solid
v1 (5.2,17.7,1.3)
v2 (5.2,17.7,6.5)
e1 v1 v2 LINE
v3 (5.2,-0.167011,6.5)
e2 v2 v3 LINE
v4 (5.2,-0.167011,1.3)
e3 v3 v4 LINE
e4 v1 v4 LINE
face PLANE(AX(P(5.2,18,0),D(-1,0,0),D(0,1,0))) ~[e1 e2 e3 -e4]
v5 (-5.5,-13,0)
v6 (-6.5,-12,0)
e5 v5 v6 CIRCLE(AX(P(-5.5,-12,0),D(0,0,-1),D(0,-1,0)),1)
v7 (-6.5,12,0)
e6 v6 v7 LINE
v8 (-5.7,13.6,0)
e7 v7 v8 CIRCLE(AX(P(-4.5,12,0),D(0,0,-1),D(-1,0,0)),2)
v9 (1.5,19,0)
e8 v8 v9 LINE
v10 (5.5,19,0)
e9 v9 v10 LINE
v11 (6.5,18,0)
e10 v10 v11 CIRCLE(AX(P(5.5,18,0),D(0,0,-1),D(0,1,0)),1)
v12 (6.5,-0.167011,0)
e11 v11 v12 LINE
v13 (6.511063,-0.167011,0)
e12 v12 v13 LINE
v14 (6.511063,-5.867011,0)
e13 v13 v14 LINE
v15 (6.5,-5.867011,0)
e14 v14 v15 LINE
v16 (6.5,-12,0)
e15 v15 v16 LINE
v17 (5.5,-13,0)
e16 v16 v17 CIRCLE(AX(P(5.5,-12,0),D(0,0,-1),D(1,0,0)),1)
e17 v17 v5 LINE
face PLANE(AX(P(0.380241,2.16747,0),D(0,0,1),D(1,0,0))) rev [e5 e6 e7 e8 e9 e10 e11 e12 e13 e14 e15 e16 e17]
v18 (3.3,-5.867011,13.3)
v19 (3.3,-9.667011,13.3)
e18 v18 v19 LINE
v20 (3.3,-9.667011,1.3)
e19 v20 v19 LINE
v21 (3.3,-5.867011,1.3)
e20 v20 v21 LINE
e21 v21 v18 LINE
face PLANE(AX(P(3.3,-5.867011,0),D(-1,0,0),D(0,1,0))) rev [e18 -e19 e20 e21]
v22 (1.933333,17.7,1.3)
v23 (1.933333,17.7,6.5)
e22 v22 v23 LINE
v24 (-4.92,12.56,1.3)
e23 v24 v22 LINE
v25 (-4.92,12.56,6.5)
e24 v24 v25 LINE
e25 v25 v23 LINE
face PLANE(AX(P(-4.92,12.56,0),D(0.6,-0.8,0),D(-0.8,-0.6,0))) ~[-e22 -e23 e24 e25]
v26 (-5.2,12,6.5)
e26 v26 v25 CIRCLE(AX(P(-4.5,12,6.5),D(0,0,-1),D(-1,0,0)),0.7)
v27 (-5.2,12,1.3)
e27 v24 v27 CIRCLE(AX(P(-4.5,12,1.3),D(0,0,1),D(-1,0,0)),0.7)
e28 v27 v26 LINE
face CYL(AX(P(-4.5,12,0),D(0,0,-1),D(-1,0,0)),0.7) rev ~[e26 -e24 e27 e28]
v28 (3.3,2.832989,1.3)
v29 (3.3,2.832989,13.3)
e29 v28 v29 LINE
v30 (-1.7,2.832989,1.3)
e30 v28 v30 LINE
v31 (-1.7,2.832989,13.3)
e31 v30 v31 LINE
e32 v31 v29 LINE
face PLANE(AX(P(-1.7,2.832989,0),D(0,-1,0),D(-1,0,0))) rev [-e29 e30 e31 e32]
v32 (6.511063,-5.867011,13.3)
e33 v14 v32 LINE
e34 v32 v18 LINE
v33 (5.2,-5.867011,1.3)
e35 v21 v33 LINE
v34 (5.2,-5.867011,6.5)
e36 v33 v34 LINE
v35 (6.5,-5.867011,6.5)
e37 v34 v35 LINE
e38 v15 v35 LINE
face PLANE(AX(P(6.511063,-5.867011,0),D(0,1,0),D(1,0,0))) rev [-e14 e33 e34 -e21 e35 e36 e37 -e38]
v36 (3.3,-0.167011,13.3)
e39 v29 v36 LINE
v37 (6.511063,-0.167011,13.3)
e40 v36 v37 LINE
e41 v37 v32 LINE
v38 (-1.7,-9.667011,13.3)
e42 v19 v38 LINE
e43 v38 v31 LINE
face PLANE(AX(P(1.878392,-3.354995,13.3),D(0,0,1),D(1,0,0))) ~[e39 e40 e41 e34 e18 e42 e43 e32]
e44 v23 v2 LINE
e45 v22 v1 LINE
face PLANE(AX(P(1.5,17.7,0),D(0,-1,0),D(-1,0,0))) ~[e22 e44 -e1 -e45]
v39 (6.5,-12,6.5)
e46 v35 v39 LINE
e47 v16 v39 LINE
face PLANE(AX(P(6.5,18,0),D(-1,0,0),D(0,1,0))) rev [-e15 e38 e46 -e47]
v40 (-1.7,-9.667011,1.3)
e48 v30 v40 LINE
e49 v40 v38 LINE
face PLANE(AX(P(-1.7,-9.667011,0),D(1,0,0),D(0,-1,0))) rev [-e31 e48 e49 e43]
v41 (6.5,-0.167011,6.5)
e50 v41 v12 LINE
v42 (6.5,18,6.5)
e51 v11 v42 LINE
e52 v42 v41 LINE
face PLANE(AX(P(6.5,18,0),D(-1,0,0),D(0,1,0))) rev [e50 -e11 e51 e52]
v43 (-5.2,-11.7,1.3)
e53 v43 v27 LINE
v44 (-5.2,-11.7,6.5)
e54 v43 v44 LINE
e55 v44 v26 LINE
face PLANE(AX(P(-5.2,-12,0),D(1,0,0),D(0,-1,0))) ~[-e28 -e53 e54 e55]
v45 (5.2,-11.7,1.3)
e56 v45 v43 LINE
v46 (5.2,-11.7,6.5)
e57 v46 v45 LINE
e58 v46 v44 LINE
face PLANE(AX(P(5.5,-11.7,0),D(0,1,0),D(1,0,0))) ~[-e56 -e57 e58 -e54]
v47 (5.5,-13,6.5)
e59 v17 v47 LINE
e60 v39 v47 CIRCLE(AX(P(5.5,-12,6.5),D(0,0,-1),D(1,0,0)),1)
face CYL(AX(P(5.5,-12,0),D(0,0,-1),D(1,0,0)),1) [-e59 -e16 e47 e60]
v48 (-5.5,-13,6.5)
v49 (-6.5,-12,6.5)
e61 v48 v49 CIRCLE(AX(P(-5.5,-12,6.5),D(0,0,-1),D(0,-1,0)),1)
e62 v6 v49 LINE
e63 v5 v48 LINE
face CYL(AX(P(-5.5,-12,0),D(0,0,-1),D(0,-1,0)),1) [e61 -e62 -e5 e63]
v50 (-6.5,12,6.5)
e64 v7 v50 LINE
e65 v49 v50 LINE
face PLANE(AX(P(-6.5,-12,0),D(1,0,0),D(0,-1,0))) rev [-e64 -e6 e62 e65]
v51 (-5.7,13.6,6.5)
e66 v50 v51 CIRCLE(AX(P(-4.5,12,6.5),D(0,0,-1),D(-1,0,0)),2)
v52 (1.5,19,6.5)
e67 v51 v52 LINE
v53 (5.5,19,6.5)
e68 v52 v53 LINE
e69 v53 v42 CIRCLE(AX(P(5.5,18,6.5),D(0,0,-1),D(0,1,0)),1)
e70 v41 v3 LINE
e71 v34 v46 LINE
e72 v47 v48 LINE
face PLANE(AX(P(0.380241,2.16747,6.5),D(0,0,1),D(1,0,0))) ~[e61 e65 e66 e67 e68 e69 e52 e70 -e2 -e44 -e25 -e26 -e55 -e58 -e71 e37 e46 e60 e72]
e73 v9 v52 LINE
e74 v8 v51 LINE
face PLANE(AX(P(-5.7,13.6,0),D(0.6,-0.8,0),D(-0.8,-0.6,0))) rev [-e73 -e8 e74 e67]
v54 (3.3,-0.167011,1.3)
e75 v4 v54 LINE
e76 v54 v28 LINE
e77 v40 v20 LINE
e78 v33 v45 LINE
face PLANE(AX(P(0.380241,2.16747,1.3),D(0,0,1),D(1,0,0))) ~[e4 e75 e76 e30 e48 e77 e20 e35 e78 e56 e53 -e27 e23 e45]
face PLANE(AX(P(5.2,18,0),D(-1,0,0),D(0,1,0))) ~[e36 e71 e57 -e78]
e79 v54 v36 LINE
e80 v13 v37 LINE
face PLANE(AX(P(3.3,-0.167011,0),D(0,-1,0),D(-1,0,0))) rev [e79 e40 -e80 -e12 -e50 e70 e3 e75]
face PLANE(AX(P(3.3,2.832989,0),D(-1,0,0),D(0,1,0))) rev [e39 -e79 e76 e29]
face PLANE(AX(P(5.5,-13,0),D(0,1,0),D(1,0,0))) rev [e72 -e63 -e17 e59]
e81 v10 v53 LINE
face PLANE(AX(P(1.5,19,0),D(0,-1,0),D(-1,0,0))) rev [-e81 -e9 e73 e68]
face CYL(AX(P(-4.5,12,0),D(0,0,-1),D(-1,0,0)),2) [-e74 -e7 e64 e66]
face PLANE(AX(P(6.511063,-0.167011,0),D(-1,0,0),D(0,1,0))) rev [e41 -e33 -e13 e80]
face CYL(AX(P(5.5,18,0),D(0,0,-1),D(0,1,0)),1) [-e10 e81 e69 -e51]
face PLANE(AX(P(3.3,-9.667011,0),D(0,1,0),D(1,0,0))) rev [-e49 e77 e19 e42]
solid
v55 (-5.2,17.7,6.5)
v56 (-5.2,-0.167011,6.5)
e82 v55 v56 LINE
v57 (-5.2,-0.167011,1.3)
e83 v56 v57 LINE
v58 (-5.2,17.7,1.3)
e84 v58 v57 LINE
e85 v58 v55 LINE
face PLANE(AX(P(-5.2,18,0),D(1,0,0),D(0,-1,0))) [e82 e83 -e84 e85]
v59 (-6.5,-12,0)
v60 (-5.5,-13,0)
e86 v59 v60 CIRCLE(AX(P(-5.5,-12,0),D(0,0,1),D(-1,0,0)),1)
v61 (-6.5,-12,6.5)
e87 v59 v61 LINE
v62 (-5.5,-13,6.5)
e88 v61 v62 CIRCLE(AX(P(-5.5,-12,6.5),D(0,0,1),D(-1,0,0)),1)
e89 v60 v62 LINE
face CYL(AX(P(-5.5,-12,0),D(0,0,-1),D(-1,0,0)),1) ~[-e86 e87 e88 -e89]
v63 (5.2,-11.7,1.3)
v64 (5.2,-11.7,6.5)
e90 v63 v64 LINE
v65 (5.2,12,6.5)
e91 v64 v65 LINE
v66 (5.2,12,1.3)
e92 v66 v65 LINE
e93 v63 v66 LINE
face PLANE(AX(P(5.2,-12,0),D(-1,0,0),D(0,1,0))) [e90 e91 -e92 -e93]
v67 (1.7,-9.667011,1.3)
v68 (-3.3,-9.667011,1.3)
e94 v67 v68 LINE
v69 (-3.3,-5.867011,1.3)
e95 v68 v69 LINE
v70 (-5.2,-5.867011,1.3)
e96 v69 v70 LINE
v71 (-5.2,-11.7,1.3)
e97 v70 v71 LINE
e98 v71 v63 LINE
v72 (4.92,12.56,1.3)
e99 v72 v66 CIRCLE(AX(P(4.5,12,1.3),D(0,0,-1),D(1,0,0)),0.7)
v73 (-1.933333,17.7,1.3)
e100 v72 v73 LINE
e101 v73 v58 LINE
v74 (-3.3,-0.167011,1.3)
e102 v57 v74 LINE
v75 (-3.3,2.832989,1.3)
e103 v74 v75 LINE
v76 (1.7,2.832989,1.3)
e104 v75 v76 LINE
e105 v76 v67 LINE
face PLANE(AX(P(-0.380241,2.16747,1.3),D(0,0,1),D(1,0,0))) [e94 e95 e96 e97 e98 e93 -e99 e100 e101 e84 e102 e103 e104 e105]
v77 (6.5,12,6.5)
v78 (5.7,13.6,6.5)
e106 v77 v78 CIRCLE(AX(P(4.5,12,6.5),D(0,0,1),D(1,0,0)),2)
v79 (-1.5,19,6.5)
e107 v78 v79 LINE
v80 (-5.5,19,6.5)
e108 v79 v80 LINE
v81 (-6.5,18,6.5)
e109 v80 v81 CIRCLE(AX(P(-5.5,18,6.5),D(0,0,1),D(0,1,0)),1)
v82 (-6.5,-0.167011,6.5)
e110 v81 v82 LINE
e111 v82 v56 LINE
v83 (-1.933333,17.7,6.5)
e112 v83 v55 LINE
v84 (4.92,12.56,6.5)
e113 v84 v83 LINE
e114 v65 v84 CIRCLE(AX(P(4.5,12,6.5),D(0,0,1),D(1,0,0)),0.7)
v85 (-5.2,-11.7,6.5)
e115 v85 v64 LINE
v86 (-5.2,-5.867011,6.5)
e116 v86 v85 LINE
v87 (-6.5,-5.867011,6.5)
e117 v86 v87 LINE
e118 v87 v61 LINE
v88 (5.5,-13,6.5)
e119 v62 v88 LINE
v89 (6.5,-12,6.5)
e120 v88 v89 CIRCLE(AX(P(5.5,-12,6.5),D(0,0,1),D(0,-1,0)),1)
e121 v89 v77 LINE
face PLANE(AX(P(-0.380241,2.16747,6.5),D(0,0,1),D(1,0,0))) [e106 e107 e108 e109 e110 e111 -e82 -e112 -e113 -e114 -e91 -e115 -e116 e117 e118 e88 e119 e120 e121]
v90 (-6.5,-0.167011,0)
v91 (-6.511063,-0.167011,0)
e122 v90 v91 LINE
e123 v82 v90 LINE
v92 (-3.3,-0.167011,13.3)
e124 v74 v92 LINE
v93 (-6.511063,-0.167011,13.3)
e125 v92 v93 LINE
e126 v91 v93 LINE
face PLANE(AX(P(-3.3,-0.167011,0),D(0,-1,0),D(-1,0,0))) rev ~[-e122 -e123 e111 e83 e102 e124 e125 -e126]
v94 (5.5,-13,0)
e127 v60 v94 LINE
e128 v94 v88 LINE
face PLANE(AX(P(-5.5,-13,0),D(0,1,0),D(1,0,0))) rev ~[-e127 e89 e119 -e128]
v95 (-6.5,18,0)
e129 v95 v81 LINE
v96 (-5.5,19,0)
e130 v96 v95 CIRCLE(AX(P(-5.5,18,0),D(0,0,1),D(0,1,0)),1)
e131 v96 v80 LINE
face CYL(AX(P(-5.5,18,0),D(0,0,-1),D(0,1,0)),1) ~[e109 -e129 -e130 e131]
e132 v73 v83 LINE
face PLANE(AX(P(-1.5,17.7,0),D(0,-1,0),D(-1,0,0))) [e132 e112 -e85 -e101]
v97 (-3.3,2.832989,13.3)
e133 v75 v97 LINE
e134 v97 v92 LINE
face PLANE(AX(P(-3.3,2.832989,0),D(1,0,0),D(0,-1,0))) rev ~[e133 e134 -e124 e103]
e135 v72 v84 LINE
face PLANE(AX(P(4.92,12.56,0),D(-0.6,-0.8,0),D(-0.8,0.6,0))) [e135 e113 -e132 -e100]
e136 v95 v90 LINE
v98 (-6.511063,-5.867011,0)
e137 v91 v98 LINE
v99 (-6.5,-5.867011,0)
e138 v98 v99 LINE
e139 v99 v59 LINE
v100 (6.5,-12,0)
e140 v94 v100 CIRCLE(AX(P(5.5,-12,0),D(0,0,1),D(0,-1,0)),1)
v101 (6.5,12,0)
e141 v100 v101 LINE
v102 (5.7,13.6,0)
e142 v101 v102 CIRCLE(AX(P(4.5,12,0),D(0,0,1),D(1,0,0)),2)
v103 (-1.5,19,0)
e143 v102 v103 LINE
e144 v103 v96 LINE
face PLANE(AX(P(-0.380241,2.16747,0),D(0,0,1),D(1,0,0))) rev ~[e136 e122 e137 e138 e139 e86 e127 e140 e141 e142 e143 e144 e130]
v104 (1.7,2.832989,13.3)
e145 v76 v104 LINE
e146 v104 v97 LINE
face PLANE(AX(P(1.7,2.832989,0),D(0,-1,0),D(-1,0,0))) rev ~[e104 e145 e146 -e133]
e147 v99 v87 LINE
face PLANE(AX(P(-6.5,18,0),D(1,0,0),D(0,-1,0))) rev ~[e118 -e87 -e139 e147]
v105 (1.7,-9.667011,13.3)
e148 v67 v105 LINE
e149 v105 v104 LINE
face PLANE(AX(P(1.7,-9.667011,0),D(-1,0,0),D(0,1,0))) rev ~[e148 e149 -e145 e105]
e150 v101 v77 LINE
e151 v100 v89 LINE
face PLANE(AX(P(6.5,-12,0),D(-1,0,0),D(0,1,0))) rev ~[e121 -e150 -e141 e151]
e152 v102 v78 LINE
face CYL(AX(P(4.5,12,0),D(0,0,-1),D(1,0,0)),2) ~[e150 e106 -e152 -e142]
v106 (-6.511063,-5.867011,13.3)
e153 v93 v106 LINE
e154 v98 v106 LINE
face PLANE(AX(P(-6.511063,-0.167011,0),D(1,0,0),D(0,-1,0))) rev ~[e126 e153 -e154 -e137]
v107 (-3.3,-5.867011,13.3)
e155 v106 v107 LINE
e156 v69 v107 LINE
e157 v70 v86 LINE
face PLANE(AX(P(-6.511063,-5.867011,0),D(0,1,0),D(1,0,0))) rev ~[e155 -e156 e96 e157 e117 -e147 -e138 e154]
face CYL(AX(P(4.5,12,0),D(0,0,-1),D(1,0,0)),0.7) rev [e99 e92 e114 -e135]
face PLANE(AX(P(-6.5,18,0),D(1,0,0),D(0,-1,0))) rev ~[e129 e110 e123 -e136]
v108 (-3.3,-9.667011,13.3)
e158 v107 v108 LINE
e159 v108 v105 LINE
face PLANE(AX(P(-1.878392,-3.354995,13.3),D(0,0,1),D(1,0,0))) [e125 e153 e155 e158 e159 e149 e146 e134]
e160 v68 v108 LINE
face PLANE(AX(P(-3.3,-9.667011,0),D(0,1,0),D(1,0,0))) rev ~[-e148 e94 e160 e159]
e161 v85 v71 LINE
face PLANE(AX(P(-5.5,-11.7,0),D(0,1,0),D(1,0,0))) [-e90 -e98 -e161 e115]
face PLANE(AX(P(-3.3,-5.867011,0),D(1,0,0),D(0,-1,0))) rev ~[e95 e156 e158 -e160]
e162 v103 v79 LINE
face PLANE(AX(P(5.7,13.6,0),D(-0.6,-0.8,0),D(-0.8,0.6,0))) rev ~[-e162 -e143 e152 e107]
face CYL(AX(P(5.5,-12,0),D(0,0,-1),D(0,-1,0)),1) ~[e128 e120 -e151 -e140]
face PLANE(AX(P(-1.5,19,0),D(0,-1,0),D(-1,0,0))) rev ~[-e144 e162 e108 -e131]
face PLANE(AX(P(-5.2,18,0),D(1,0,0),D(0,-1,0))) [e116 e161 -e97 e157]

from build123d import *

# Parameters (mm, degrees)
F1_DEPTH = 6.5
F2_T     = -1.3
F4_DEPTH = 13.3


# Not quite as in the source:
# - a feature names something its author has since deleted; it is built from what else it names


with BuildPart() as f1:
    # F0 (on Top) → F1 (new body)
    with BuildSketch(Plane.XY):
        with BuildLine():
            Line((-5.5, -13), (5.5, -13))
            ThreePointArc((5.5, -13), (6.2071067812, -12.7071067812), (6.5, -12))
            Line((6.5, -12), (6.5, 12))
            ThreePointArc((6.5, 12), (6.288854382, 12.894427191), (5.7, 13.6))
            Line((5.7, 13.6), (-1.5, 19))
            Line((-1.5, 19), (-5.5, 19))
            ThreePointArc((-5.5, 19), (-6.2071067812, 18.7071067812), (-6.5, 18))
            Line((-6.5, 18), (-6.5, 13))
            Line((-6.5, 13), (-6.5, -12))
            ThreePointArc((-6.5, -12), (-6.2071067812, -12.7071067812), (-5.5, -13))
        make_face()
    extrude(amount=F1_DEPTH)

    # F2
    f2_openings = [f1.faces().sort_by_distance(p)[0] for p in [
        (-0.234078, 2.146096, 6.5),
    ]]
    offset(amount=F2_T, openings=f2_openings)

    # F3 (on Top) → F4 (join)
    with BuildSketch(Plane.XY):
        Polygon((-3.3, -9.6670114048), (1.7, -9.6670114048), (1.7, 2.8329885952), (-3.3, 2.8329885952), (-3.3, -0.1670114048), (-6.5110628493, -0.1670114048), (-6.5110628493, -5.8670114048), (-3.3, -5.8670114048), align=None)
    extrude(amount=F4_DEPTH)


with BuildPart() as f6_1:
    # F6: instance of F1
    add(f1.part.mirror(Plane.YZ))


solid = Compound([f1.part, f6_1.part])
